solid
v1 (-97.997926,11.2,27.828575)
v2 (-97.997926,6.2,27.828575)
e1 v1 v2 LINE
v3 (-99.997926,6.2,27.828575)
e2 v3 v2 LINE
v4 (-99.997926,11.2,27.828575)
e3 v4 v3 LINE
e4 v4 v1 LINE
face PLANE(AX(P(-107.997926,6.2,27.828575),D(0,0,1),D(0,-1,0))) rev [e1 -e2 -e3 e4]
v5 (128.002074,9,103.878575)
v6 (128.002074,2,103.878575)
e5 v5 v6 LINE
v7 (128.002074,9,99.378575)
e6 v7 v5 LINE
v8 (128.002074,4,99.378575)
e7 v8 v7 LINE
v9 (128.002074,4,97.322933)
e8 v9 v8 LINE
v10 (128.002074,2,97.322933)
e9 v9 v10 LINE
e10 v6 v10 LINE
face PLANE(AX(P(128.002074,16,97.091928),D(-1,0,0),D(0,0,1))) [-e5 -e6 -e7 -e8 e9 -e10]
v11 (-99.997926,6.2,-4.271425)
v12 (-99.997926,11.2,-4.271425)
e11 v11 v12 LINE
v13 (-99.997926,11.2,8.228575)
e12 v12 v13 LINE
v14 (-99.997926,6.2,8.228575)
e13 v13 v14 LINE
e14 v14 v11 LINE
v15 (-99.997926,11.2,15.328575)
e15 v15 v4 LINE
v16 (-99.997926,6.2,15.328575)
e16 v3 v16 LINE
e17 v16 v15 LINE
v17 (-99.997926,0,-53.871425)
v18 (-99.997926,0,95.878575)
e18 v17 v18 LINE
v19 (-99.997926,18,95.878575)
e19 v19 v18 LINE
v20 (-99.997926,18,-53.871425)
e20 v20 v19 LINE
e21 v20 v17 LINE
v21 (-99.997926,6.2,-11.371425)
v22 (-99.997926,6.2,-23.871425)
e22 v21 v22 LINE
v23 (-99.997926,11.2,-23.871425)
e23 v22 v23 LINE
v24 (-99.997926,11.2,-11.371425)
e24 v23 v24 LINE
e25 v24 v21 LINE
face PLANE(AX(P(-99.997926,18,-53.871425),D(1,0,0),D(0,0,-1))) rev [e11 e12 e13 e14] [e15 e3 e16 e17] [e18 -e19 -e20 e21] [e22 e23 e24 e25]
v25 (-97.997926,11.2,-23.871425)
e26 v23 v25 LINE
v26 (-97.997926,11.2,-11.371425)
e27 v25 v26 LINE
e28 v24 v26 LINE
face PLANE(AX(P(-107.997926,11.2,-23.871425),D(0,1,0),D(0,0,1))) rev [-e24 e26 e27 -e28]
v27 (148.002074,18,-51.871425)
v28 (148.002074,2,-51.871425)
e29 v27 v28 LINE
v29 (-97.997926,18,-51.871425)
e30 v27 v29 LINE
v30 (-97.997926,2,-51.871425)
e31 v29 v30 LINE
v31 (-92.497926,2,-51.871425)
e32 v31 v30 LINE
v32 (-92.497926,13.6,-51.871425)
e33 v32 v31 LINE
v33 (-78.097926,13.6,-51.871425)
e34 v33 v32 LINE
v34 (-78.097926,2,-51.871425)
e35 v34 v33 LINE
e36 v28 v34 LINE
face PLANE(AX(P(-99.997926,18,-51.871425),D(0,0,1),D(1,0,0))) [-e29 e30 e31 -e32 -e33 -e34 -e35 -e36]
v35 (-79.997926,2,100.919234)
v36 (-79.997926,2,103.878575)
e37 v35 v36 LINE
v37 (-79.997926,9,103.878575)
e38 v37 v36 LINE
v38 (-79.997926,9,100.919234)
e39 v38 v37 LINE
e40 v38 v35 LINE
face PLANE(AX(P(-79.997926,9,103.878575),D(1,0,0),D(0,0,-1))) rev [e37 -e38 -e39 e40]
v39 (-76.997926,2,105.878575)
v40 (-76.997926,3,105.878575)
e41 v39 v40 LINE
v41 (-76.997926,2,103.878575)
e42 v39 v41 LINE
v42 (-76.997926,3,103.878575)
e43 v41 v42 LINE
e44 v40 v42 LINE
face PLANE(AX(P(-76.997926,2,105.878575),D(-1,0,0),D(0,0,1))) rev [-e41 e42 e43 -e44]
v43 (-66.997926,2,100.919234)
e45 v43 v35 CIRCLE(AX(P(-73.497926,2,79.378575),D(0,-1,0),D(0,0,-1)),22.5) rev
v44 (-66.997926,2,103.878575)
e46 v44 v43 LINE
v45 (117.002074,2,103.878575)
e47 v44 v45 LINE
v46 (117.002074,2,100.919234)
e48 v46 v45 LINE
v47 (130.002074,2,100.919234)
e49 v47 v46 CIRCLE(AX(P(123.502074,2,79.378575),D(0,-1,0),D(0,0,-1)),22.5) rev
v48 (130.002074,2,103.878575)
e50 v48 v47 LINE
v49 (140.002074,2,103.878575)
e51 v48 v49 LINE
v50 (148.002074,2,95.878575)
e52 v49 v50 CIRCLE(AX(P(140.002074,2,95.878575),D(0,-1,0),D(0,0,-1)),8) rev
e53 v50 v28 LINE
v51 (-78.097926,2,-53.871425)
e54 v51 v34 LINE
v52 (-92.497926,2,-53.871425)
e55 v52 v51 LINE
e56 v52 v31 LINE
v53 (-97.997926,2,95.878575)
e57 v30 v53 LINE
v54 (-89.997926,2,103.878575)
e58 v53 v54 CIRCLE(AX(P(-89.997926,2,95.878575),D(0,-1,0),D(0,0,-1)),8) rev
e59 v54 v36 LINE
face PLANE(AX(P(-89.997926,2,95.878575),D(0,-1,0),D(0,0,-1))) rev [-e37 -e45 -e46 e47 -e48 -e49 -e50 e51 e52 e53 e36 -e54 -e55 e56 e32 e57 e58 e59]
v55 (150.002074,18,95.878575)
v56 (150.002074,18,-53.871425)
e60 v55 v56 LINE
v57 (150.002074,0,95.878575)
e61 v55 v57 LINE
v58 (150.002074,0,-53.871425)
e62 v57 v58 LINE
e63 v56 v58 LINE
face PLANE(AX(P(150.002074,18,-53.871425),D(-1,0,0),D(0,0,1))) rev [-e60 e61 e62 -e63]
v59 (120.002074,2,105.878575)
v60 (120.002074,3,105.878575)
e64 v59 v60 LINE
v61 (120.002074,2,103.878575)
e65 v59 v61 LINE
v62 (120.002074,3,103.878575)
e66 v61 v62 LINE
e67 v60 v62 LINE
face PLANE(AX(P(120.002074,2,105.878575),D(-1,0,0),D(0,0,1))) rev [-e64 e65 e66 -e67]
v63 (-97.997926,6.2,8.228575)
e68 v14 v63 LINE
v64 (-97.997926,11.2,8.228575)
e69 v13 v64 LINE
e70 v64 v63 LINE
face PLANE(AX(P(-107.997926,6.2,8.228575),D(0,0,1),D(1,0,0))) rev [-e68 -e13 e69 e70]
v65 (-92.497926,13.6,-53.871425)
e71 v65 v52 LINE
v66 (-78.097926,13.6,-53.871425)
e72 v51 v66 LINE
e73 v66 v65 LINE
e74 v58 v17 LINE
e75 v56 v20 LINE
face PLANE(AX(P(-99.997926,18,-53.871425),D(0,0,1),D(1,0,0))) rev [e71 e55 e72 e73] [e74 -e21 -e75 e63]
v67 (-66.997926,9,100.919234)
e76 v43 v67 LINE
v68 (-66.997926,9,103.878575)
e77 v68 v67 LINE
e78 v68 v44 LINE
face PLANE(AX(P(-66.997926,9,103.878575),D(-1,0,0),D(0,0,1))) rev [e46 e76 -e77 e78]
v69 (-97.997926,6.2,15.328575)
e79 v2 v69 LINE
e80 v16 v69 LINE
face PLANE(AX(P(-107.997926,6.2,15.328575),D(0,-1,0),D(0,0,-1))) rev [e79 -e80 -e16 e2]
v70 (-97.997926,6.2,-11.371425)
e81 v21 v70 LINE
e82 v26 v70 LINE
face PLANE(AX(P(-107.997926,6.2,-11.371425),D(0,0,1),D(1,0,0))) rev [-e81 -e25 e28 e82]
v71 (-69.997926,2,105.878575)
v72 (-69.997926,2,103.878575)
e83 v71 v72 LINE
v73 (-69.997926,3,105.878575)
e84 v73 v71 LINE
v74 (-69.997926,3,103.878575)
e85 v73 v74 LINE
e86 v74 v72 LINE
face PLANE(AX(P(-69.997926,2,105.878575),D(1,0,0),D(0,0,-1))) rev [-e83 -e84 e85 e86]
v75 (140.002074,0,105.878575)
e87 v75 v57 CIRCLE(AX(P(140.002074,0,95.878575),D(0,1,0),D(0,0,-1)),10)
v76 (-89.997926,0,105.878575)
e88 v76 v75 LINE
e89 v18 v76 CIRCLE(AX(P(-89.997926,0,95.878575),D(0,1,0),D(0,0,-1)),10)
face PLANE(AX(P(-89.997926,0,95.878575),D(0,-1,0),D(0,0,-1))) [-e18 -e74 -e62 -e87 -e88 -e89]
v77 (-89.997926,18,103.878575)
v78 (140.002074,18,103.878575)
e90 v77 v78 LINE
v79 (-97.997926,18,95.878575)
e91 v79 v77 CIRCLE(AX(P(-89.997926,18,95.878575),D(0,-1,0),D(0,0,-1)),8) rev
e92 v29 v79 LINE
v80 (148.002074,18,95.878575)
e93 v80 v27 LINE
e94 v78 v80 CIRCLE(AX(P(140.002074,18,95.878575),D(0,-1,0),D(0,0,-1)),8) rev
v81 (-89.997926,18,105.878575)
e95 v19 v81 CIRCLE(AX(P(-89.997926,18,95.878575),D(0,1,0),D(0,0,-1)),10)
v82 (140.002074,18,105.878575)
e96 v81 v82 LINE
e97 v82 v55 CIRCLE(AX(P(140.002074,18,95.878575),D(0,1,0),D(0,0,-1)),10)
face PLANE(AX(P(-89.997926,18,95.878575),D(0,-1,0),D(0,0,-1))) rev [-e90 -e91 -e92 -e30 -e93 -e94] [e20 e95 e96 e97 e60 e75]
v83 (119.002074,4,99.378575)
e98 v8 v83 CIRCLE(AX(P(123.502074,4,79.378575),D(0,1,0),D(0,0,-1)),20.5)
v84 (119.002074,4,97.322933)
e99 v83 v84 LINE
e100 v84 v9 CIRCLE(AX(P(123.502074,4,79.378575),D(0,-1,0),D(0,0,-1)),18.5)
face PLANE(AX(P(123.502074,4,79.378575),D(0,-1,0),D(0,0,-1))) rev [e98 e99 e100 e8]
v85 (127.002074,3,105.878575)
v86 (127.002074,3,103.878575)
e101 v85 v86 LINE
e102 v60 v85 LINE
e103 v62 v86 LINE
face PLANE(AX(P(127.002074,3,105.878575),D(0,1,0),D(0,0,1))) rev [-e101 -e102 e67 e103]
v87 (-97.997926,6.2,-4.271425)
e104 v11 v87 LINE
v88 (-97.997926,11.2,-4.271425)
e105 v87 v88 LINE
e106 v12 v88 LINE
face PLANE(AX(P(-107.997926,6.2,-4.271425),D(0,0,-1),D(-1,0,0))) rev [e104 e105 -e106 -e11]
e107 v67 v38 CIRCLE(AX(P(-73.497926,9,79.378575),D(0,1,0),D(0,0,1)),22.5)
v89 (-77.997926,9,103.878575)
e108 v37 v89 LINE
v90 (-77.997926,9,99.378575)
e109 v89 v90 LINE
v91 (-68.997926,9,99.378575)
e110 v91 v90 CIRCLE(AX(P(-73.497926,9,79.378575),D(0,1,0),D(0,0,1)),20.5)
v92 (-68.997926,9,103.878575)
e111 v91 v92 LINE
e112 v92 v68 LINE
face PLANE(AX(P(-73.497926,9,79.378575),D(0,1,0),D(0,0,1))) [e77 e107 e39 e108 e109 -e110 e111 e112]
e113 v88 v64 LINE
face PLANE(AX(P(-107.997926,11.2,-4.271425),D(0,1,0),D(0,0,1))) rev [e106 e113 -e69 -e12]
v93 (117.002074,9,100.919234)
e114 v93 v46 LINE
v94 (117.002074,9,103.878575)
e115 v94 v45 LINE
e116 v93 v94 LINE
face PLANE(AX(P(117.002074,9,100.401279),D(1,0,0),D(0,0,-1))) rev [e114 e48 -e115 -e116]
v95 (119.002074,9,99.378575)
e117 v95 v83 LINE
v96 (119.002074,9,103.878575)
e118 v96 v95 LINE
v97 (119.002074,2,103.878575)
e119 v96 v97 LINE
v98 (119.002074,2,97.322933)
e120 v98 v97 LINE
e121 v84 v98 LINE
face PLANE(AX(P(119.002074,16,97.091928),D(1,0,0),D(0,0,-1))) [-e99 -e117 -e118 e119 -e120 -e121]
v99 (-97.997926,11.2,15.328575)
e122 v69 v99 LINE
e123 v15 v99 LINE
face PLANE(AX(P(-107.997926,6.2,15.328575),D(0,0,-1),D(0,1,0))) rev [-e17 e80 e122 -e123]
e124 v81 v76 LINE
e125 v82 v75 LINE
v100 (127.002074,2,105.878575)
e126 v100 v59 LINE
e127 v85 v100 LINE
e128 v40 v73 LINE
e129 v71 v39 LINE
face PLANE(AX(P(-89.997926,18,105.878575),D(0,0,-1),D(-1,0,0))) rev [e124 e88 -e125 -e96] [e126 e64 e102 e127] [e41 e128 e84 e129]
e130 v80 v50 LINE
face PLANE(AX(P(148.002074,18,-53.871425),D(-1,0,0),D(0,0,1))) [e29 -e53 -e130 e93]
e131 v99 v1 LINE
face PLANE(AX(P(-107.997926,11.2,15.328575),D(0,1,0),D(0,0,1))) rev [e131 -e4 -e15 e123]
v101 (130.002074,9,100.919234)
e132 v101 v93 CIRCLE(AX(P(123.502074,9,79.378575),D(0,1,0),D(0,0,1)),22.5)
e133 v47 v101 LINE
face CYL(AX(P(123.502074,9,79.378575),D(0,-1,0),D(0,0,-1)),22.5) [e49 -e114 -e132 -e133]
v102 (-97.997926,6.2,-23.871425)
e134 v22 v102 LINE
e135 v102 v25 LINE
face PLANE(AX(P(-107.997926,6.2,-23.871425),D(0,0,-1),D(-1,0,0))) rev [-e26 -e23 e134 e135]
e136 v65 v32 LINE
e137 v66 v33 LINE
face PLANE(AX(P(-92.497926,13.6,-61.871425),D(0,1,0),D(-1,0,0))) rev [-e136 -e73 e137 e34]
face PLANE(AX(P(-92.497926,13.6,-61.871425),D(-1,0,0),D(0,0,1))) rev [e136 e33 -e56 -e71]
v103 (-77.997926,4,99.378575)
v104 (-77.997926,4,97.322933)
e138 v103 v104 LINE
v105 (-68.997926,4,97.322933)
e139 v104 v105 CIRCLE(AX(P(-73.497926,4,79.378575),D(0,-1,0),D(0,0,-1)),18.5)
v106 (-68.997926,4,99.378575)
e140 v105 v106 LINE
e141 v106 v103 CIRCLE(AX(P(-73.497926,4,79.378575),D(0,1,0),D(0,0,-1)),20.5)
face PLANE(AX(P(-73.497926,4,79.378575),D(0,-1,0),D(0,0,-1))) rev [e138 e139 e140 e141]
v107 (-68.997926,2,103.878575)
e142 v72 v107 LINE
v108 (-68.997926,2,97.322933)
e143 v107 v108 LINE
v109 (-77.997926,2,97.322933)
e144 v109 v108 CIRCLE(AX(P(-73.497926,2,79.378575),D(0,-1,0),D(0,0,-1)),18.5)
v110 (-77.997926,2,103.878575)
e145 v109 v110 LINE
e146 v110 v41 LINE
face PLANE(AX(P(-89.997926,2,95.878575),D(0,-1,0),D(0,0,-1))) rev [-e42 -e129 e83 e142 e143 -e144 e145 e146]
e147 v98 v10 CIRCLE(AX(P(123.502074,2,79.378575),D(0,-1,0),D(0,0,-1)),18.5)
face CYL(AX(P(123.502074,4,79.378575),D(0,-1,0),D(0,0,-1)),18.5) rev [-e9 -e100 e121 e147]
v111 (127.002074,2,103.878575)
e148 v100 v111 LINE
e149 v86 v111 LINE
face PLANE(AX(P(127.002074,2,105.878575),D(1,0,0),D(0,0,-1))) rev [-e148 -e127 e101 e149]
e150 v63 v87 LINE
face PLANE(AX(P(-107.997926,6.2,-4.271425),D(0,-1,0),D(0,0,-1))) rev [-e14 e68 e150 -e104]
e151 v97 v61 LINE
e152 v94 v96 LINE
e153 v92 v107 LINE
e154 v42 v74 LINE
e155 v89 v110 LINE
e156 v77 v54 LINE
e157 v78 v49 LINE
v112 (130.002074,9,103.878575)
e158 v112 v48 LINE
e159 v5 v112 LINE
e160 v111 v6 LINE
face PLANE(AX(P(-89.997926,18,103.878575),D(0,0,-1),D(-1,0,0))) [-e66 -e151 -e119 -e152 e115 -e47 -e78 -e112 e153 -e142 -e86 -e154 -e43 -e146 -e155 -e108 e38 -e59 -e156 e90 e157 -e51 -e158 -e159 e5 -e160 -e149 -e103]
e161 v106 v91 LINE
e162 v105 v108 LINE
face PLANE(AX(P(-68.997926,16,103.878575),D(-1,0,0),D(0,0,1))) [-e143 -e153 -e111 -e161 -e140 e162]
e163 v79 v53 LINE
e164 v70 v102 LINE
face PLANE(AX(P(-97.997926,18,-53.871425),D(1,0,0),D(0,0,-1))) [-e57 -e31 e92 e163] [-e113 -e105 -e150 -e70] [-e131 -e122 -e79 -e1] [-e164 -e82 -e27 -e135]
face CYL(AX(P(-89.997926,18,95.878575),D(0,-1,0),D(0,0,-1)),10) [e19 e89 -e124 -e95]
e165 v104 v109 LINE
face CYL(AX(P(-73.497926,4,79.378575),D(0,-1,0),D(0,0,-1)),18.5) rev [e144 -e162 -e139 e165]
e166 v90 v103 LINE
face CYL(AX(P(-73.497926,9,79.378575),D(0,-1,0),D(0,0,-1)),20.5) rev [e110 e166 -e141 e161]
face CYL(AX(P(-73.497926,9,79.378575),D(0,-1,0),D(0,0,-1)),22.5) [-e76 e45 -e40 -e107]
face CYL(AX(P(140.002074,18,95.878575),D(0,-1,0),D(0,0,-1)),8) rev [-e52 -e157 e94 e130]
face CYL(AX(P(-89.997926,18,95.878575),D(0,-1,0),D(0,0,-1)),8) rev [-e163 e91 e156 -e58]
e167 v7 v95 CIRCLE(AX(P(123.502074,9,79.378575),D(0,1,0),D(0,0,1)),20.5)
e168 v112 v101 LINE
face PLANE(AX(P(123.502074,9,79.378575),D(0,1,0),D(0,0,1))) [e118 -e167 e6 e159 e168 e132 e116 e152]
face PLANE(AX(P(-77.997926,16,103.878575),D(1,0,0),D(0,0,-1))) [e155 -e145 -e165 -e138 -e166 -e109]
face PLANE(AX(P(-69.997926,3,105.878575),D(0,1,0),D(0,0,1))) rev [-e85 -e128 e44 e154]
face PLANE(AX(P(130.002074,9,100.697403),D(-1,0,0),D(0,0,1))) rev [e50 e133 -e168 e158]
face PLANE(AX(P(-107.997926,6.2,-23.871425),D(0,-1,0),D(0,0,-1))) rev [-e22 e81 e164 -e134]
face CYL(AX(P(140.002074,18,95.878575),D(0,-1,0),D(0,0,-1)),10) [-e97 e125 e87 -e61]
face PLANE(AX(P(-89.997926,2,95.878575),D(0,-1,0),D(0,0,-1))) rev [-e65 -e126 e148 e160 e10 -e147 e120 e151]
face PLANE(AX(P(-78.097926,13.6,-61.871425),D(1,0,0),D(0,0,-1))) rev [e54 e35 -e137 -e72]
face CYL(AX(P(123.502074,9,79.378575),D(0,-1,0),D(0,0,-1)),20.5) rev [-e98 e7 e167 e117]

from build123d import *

# Parameters (mm, degrees)
EXTRUDE_2_DEPTH     = 18
SHELL_3_T           = -2
SKETCH_2_W          = 14.4
SKETCH_2_H          = 11.6
CUT_EXTRUDE_1_DEPTH = 10
SKETCH_3_W          = 12.5
SKETCH_3_H          = 5
CUT_EXTRUDE_2_DEPTH = 10
SKETCH_4_R          = 22.5
EXTRUDE_5_DEPTH     = 7
SHELL_START         = 2
SHELL_4_OUTLINE_R   = 20.5
SHELL_4_DEPTH       = 7
SKETCH_6_W          = 9
SKETCH_6_H          = 6.786647167
CUT_EXTRUDE_4_DEPTH = 14
SKETCH_9_W          = 2
SKETCH_9_H          = 3.464226151
SKETCH_9_H_2        = 3.181171453
SKETCH_9_H_3        = 3.477296157
EXTRUDE_6_DEPTH     = 7
EXTRUDE_8_DEPTH     = 2
SKETCH_11_W         = 7
SKETCH_11_H         = 1
CUT_EXTRUDE_5_DEPTH = 2


# Read off the part's stored shape, not the designer's step: 抽壳4
with BuildPart() as part:
    # 草图1 → 凸台-拉伸2 (new body)
    with BuildSketch(Plane(origin=(0, 0, 0), x_dir=(1, 0, 0), z_dir=(0, 1, 0))):
        with BuildLine():
            Line((-99.99792574, 53.871425224), (150.00207426, 53.871425224))
            Line((150.00207426, 53.871425224), (150.00207426, -95.878574776))
            ThreePointArc((150.00207426, -95.878574776), (147.073142072, -102.949642588), (140.00207426, -105.878574776))
            Line((140.00207426, -105.878574776), (-89.99792574, -105.878574776))
            ThreePointArc((-89.99792574, -105.878574776), (-97.068993552, -102.949642588), (-99.99792574, -95.878574776))
            Line((-99.99792574, -95.878574776), (-99.99792574, 53.871425224))
        make_face()
    extrude(amount=EXTRUDE_2_DEPTH)

    # 抽壳3
    shell_3_openings = [part.faces().sort_by_distance(p)[0] for p in [
        (25.00207426, 18, 25.920044782),
    ]]
    offset(amount=SHELL_3_T, openings=shell_3_openings, kind=Kind.INTERSECTION)

    # 草图2 → 切除-拉伸1 (cut)
    with BuildSketch(Plane.XY.offset(-51.871425224)):
        with Locations((-85.29792574, 7.8)):
            Rectangle(SKETCH_2_W, SKETCH_2_H)
    extrude(amount=-CUT_EXTRUDE_1_DEPTH, mode=Mode.SUBTRACT)

    # 草图3 → 切除-拉伸2 (cut)
    with BuildSketch(Plane(origin=(-97.99792574, 0, 0), x_dir=(0, 0, -1), z_dir=(1, 0, 0))):
        with Locations((17.621425224, 8.7)):
            Rectangle(SKETCH_3_W, SKETCH_3_H)
        with Locations((-1.978574776, 8.7)):
            Rectangle(SKETCH_3_W, SKETCH_3_H)
        with Locations((-21.578574776, 8.7)):
            Rectangle(SKETCH_3_W, SKETCH_3_H)
    extrude(amount=-CUT_EXTRUDE_2_DEPTH, mode=Mode.SUBTRACT)

    # 草图4 → 凸台-拉伸5 (add)
    with BuildSketch(Plane(origin=(0, 2, 0), x_dir=(1, 0, 0), z_dir=(0, 1, 0))):
        with Locations(Location((-73.49792574, -79.378574776, 0), (0, 0, 90))):
            Circle(SKETCH_4_R)
        with Locations(Location((123.50207426, -79.378574776, 0), (0, 0, 90))):
            Circle(SKETCH_4_R)
    extrude(amount=EXTRUDE_5_DEPTH)

    # 抽壳4 outline → 抽壳4 (cut)
    with BuildSketch(Plane(origin=(0, 0, 0), x_dir=(1, 0, 0), z_dir=(0, 1, 0)).offset(SHELL_START)):
        with Locations((123.50207426, -79.378574776)):
            Circle(SHELL_4_OUTLINE_R)
        with Locations((-73.49792574, -79.378574776)):
            Circle(SHELL_4_OUTLINE_R)
    extrude(amount=SHELL_4_DEPTH, mode=Mode.SUBTRACT)

    # 草图6 → 切除-拉伸4 (cut)
    with BuildSketch(Plane(origin=(0, 2, 0), x_dir=(1, 0, 0), z_dir=(0, 1, 0))):
        with Locations((-73.49792574, -100.485251193)):
            Rectangle(SKETCH_6_W, SKETCH_6_H)
        with Locations((123.50207426, -100.485251193)):
            Rectangle(SKETCH_6_W, SKETCH_6_H)
    extrude(amount=CUT_EXTRUDE_4_DEPTH, mode=Mode.SUBTRACT)

    # 草图9 → 凸台-拉伸6 (add)
    with BuildSketch(Plane(origin=(0, 2, 0), x_dir=(1, 0, 0), z_dir=(0, 1, 0))):
        with Locations((-78.99792574, -102.1464617)):
            Rectangle(SKETCH_9_W, SKETCH_9_H)
        with Locations((-67.99792574, -102.287989049)):
            Rectangle(SKETCH_9_W, SKETCH_9_H_2)
        with Locations((129.00207426, -102.287989049)):
            Rectangle(SKETCH_9_W, SKETCH_9_H_2)
        with Locations((118.00207426, -102.139926698)):
            Rectangle(SKETCH_9_W, SKETCH_9_H_3)
    extrude(amount=EXTRUDE_6_DEPTH)

    # 草图10 → 凸台-拉伸8 (add)
    with BuildSketch(Plane(origin=(0, 2, 0), x_dir=(1, 0, 0), z_dir=(0, 1, 0))):
        with BuildLine():
            Line((-77.99792574, -99.378574776), (-77.99792574, -97.322933221))
            ThreePointArc((-77.99792574, -97.322933221), (-73.49792574, -60.878574776), (-68.99792574, -97.322933221))
            Line((-68.99792574, -97.322933221), (-68.99792574, -99.378574776))
            ThreePointArc((-68.99792574, -99.378574776), (-73.49792574, -58.878574776), (-77.99792574, -99.378574776))
        make_face()
        with BuildLine():
            Line((119.00207426, -97.322933221), (119.00207426, -99.378574776))
            ThreePointArc((119.00207426, -99.378574776), (123.50207426, -58.878574776), (128.00207426, -99.378574776))
            Line((128.00207426, -99.378574776), (128.00207426, -97.322933221))
            ThreePointArc((128.00207426, -97.322933221), (123.50207426, -60.878574776), (119.00207426, -97.322933221))
        make_face()
    extrude(amount=EXTRUDE_8_DEPTH)

    # 草图11 → 切除-拉伸5 (cut)
    with BuildSketch(Plane(origin=(0, 0, 103.878574776), x_dir=(-1, 0, 0), z_dir=(0, 0, -1))):
        with Locations((73.49792574, 2.5)):
            Rectangle(SKETCH_11_W, SKETCH_11_H)
        with Locations((-123.50207426, 2.5)):
            Rectangle(SKETCH_11_W, SKETCH_11_H)
    extrude(amount=-CUT_EXTRUDE_5_DEPTH, mode=Mode.SUBTRACT)


solid = part.part
